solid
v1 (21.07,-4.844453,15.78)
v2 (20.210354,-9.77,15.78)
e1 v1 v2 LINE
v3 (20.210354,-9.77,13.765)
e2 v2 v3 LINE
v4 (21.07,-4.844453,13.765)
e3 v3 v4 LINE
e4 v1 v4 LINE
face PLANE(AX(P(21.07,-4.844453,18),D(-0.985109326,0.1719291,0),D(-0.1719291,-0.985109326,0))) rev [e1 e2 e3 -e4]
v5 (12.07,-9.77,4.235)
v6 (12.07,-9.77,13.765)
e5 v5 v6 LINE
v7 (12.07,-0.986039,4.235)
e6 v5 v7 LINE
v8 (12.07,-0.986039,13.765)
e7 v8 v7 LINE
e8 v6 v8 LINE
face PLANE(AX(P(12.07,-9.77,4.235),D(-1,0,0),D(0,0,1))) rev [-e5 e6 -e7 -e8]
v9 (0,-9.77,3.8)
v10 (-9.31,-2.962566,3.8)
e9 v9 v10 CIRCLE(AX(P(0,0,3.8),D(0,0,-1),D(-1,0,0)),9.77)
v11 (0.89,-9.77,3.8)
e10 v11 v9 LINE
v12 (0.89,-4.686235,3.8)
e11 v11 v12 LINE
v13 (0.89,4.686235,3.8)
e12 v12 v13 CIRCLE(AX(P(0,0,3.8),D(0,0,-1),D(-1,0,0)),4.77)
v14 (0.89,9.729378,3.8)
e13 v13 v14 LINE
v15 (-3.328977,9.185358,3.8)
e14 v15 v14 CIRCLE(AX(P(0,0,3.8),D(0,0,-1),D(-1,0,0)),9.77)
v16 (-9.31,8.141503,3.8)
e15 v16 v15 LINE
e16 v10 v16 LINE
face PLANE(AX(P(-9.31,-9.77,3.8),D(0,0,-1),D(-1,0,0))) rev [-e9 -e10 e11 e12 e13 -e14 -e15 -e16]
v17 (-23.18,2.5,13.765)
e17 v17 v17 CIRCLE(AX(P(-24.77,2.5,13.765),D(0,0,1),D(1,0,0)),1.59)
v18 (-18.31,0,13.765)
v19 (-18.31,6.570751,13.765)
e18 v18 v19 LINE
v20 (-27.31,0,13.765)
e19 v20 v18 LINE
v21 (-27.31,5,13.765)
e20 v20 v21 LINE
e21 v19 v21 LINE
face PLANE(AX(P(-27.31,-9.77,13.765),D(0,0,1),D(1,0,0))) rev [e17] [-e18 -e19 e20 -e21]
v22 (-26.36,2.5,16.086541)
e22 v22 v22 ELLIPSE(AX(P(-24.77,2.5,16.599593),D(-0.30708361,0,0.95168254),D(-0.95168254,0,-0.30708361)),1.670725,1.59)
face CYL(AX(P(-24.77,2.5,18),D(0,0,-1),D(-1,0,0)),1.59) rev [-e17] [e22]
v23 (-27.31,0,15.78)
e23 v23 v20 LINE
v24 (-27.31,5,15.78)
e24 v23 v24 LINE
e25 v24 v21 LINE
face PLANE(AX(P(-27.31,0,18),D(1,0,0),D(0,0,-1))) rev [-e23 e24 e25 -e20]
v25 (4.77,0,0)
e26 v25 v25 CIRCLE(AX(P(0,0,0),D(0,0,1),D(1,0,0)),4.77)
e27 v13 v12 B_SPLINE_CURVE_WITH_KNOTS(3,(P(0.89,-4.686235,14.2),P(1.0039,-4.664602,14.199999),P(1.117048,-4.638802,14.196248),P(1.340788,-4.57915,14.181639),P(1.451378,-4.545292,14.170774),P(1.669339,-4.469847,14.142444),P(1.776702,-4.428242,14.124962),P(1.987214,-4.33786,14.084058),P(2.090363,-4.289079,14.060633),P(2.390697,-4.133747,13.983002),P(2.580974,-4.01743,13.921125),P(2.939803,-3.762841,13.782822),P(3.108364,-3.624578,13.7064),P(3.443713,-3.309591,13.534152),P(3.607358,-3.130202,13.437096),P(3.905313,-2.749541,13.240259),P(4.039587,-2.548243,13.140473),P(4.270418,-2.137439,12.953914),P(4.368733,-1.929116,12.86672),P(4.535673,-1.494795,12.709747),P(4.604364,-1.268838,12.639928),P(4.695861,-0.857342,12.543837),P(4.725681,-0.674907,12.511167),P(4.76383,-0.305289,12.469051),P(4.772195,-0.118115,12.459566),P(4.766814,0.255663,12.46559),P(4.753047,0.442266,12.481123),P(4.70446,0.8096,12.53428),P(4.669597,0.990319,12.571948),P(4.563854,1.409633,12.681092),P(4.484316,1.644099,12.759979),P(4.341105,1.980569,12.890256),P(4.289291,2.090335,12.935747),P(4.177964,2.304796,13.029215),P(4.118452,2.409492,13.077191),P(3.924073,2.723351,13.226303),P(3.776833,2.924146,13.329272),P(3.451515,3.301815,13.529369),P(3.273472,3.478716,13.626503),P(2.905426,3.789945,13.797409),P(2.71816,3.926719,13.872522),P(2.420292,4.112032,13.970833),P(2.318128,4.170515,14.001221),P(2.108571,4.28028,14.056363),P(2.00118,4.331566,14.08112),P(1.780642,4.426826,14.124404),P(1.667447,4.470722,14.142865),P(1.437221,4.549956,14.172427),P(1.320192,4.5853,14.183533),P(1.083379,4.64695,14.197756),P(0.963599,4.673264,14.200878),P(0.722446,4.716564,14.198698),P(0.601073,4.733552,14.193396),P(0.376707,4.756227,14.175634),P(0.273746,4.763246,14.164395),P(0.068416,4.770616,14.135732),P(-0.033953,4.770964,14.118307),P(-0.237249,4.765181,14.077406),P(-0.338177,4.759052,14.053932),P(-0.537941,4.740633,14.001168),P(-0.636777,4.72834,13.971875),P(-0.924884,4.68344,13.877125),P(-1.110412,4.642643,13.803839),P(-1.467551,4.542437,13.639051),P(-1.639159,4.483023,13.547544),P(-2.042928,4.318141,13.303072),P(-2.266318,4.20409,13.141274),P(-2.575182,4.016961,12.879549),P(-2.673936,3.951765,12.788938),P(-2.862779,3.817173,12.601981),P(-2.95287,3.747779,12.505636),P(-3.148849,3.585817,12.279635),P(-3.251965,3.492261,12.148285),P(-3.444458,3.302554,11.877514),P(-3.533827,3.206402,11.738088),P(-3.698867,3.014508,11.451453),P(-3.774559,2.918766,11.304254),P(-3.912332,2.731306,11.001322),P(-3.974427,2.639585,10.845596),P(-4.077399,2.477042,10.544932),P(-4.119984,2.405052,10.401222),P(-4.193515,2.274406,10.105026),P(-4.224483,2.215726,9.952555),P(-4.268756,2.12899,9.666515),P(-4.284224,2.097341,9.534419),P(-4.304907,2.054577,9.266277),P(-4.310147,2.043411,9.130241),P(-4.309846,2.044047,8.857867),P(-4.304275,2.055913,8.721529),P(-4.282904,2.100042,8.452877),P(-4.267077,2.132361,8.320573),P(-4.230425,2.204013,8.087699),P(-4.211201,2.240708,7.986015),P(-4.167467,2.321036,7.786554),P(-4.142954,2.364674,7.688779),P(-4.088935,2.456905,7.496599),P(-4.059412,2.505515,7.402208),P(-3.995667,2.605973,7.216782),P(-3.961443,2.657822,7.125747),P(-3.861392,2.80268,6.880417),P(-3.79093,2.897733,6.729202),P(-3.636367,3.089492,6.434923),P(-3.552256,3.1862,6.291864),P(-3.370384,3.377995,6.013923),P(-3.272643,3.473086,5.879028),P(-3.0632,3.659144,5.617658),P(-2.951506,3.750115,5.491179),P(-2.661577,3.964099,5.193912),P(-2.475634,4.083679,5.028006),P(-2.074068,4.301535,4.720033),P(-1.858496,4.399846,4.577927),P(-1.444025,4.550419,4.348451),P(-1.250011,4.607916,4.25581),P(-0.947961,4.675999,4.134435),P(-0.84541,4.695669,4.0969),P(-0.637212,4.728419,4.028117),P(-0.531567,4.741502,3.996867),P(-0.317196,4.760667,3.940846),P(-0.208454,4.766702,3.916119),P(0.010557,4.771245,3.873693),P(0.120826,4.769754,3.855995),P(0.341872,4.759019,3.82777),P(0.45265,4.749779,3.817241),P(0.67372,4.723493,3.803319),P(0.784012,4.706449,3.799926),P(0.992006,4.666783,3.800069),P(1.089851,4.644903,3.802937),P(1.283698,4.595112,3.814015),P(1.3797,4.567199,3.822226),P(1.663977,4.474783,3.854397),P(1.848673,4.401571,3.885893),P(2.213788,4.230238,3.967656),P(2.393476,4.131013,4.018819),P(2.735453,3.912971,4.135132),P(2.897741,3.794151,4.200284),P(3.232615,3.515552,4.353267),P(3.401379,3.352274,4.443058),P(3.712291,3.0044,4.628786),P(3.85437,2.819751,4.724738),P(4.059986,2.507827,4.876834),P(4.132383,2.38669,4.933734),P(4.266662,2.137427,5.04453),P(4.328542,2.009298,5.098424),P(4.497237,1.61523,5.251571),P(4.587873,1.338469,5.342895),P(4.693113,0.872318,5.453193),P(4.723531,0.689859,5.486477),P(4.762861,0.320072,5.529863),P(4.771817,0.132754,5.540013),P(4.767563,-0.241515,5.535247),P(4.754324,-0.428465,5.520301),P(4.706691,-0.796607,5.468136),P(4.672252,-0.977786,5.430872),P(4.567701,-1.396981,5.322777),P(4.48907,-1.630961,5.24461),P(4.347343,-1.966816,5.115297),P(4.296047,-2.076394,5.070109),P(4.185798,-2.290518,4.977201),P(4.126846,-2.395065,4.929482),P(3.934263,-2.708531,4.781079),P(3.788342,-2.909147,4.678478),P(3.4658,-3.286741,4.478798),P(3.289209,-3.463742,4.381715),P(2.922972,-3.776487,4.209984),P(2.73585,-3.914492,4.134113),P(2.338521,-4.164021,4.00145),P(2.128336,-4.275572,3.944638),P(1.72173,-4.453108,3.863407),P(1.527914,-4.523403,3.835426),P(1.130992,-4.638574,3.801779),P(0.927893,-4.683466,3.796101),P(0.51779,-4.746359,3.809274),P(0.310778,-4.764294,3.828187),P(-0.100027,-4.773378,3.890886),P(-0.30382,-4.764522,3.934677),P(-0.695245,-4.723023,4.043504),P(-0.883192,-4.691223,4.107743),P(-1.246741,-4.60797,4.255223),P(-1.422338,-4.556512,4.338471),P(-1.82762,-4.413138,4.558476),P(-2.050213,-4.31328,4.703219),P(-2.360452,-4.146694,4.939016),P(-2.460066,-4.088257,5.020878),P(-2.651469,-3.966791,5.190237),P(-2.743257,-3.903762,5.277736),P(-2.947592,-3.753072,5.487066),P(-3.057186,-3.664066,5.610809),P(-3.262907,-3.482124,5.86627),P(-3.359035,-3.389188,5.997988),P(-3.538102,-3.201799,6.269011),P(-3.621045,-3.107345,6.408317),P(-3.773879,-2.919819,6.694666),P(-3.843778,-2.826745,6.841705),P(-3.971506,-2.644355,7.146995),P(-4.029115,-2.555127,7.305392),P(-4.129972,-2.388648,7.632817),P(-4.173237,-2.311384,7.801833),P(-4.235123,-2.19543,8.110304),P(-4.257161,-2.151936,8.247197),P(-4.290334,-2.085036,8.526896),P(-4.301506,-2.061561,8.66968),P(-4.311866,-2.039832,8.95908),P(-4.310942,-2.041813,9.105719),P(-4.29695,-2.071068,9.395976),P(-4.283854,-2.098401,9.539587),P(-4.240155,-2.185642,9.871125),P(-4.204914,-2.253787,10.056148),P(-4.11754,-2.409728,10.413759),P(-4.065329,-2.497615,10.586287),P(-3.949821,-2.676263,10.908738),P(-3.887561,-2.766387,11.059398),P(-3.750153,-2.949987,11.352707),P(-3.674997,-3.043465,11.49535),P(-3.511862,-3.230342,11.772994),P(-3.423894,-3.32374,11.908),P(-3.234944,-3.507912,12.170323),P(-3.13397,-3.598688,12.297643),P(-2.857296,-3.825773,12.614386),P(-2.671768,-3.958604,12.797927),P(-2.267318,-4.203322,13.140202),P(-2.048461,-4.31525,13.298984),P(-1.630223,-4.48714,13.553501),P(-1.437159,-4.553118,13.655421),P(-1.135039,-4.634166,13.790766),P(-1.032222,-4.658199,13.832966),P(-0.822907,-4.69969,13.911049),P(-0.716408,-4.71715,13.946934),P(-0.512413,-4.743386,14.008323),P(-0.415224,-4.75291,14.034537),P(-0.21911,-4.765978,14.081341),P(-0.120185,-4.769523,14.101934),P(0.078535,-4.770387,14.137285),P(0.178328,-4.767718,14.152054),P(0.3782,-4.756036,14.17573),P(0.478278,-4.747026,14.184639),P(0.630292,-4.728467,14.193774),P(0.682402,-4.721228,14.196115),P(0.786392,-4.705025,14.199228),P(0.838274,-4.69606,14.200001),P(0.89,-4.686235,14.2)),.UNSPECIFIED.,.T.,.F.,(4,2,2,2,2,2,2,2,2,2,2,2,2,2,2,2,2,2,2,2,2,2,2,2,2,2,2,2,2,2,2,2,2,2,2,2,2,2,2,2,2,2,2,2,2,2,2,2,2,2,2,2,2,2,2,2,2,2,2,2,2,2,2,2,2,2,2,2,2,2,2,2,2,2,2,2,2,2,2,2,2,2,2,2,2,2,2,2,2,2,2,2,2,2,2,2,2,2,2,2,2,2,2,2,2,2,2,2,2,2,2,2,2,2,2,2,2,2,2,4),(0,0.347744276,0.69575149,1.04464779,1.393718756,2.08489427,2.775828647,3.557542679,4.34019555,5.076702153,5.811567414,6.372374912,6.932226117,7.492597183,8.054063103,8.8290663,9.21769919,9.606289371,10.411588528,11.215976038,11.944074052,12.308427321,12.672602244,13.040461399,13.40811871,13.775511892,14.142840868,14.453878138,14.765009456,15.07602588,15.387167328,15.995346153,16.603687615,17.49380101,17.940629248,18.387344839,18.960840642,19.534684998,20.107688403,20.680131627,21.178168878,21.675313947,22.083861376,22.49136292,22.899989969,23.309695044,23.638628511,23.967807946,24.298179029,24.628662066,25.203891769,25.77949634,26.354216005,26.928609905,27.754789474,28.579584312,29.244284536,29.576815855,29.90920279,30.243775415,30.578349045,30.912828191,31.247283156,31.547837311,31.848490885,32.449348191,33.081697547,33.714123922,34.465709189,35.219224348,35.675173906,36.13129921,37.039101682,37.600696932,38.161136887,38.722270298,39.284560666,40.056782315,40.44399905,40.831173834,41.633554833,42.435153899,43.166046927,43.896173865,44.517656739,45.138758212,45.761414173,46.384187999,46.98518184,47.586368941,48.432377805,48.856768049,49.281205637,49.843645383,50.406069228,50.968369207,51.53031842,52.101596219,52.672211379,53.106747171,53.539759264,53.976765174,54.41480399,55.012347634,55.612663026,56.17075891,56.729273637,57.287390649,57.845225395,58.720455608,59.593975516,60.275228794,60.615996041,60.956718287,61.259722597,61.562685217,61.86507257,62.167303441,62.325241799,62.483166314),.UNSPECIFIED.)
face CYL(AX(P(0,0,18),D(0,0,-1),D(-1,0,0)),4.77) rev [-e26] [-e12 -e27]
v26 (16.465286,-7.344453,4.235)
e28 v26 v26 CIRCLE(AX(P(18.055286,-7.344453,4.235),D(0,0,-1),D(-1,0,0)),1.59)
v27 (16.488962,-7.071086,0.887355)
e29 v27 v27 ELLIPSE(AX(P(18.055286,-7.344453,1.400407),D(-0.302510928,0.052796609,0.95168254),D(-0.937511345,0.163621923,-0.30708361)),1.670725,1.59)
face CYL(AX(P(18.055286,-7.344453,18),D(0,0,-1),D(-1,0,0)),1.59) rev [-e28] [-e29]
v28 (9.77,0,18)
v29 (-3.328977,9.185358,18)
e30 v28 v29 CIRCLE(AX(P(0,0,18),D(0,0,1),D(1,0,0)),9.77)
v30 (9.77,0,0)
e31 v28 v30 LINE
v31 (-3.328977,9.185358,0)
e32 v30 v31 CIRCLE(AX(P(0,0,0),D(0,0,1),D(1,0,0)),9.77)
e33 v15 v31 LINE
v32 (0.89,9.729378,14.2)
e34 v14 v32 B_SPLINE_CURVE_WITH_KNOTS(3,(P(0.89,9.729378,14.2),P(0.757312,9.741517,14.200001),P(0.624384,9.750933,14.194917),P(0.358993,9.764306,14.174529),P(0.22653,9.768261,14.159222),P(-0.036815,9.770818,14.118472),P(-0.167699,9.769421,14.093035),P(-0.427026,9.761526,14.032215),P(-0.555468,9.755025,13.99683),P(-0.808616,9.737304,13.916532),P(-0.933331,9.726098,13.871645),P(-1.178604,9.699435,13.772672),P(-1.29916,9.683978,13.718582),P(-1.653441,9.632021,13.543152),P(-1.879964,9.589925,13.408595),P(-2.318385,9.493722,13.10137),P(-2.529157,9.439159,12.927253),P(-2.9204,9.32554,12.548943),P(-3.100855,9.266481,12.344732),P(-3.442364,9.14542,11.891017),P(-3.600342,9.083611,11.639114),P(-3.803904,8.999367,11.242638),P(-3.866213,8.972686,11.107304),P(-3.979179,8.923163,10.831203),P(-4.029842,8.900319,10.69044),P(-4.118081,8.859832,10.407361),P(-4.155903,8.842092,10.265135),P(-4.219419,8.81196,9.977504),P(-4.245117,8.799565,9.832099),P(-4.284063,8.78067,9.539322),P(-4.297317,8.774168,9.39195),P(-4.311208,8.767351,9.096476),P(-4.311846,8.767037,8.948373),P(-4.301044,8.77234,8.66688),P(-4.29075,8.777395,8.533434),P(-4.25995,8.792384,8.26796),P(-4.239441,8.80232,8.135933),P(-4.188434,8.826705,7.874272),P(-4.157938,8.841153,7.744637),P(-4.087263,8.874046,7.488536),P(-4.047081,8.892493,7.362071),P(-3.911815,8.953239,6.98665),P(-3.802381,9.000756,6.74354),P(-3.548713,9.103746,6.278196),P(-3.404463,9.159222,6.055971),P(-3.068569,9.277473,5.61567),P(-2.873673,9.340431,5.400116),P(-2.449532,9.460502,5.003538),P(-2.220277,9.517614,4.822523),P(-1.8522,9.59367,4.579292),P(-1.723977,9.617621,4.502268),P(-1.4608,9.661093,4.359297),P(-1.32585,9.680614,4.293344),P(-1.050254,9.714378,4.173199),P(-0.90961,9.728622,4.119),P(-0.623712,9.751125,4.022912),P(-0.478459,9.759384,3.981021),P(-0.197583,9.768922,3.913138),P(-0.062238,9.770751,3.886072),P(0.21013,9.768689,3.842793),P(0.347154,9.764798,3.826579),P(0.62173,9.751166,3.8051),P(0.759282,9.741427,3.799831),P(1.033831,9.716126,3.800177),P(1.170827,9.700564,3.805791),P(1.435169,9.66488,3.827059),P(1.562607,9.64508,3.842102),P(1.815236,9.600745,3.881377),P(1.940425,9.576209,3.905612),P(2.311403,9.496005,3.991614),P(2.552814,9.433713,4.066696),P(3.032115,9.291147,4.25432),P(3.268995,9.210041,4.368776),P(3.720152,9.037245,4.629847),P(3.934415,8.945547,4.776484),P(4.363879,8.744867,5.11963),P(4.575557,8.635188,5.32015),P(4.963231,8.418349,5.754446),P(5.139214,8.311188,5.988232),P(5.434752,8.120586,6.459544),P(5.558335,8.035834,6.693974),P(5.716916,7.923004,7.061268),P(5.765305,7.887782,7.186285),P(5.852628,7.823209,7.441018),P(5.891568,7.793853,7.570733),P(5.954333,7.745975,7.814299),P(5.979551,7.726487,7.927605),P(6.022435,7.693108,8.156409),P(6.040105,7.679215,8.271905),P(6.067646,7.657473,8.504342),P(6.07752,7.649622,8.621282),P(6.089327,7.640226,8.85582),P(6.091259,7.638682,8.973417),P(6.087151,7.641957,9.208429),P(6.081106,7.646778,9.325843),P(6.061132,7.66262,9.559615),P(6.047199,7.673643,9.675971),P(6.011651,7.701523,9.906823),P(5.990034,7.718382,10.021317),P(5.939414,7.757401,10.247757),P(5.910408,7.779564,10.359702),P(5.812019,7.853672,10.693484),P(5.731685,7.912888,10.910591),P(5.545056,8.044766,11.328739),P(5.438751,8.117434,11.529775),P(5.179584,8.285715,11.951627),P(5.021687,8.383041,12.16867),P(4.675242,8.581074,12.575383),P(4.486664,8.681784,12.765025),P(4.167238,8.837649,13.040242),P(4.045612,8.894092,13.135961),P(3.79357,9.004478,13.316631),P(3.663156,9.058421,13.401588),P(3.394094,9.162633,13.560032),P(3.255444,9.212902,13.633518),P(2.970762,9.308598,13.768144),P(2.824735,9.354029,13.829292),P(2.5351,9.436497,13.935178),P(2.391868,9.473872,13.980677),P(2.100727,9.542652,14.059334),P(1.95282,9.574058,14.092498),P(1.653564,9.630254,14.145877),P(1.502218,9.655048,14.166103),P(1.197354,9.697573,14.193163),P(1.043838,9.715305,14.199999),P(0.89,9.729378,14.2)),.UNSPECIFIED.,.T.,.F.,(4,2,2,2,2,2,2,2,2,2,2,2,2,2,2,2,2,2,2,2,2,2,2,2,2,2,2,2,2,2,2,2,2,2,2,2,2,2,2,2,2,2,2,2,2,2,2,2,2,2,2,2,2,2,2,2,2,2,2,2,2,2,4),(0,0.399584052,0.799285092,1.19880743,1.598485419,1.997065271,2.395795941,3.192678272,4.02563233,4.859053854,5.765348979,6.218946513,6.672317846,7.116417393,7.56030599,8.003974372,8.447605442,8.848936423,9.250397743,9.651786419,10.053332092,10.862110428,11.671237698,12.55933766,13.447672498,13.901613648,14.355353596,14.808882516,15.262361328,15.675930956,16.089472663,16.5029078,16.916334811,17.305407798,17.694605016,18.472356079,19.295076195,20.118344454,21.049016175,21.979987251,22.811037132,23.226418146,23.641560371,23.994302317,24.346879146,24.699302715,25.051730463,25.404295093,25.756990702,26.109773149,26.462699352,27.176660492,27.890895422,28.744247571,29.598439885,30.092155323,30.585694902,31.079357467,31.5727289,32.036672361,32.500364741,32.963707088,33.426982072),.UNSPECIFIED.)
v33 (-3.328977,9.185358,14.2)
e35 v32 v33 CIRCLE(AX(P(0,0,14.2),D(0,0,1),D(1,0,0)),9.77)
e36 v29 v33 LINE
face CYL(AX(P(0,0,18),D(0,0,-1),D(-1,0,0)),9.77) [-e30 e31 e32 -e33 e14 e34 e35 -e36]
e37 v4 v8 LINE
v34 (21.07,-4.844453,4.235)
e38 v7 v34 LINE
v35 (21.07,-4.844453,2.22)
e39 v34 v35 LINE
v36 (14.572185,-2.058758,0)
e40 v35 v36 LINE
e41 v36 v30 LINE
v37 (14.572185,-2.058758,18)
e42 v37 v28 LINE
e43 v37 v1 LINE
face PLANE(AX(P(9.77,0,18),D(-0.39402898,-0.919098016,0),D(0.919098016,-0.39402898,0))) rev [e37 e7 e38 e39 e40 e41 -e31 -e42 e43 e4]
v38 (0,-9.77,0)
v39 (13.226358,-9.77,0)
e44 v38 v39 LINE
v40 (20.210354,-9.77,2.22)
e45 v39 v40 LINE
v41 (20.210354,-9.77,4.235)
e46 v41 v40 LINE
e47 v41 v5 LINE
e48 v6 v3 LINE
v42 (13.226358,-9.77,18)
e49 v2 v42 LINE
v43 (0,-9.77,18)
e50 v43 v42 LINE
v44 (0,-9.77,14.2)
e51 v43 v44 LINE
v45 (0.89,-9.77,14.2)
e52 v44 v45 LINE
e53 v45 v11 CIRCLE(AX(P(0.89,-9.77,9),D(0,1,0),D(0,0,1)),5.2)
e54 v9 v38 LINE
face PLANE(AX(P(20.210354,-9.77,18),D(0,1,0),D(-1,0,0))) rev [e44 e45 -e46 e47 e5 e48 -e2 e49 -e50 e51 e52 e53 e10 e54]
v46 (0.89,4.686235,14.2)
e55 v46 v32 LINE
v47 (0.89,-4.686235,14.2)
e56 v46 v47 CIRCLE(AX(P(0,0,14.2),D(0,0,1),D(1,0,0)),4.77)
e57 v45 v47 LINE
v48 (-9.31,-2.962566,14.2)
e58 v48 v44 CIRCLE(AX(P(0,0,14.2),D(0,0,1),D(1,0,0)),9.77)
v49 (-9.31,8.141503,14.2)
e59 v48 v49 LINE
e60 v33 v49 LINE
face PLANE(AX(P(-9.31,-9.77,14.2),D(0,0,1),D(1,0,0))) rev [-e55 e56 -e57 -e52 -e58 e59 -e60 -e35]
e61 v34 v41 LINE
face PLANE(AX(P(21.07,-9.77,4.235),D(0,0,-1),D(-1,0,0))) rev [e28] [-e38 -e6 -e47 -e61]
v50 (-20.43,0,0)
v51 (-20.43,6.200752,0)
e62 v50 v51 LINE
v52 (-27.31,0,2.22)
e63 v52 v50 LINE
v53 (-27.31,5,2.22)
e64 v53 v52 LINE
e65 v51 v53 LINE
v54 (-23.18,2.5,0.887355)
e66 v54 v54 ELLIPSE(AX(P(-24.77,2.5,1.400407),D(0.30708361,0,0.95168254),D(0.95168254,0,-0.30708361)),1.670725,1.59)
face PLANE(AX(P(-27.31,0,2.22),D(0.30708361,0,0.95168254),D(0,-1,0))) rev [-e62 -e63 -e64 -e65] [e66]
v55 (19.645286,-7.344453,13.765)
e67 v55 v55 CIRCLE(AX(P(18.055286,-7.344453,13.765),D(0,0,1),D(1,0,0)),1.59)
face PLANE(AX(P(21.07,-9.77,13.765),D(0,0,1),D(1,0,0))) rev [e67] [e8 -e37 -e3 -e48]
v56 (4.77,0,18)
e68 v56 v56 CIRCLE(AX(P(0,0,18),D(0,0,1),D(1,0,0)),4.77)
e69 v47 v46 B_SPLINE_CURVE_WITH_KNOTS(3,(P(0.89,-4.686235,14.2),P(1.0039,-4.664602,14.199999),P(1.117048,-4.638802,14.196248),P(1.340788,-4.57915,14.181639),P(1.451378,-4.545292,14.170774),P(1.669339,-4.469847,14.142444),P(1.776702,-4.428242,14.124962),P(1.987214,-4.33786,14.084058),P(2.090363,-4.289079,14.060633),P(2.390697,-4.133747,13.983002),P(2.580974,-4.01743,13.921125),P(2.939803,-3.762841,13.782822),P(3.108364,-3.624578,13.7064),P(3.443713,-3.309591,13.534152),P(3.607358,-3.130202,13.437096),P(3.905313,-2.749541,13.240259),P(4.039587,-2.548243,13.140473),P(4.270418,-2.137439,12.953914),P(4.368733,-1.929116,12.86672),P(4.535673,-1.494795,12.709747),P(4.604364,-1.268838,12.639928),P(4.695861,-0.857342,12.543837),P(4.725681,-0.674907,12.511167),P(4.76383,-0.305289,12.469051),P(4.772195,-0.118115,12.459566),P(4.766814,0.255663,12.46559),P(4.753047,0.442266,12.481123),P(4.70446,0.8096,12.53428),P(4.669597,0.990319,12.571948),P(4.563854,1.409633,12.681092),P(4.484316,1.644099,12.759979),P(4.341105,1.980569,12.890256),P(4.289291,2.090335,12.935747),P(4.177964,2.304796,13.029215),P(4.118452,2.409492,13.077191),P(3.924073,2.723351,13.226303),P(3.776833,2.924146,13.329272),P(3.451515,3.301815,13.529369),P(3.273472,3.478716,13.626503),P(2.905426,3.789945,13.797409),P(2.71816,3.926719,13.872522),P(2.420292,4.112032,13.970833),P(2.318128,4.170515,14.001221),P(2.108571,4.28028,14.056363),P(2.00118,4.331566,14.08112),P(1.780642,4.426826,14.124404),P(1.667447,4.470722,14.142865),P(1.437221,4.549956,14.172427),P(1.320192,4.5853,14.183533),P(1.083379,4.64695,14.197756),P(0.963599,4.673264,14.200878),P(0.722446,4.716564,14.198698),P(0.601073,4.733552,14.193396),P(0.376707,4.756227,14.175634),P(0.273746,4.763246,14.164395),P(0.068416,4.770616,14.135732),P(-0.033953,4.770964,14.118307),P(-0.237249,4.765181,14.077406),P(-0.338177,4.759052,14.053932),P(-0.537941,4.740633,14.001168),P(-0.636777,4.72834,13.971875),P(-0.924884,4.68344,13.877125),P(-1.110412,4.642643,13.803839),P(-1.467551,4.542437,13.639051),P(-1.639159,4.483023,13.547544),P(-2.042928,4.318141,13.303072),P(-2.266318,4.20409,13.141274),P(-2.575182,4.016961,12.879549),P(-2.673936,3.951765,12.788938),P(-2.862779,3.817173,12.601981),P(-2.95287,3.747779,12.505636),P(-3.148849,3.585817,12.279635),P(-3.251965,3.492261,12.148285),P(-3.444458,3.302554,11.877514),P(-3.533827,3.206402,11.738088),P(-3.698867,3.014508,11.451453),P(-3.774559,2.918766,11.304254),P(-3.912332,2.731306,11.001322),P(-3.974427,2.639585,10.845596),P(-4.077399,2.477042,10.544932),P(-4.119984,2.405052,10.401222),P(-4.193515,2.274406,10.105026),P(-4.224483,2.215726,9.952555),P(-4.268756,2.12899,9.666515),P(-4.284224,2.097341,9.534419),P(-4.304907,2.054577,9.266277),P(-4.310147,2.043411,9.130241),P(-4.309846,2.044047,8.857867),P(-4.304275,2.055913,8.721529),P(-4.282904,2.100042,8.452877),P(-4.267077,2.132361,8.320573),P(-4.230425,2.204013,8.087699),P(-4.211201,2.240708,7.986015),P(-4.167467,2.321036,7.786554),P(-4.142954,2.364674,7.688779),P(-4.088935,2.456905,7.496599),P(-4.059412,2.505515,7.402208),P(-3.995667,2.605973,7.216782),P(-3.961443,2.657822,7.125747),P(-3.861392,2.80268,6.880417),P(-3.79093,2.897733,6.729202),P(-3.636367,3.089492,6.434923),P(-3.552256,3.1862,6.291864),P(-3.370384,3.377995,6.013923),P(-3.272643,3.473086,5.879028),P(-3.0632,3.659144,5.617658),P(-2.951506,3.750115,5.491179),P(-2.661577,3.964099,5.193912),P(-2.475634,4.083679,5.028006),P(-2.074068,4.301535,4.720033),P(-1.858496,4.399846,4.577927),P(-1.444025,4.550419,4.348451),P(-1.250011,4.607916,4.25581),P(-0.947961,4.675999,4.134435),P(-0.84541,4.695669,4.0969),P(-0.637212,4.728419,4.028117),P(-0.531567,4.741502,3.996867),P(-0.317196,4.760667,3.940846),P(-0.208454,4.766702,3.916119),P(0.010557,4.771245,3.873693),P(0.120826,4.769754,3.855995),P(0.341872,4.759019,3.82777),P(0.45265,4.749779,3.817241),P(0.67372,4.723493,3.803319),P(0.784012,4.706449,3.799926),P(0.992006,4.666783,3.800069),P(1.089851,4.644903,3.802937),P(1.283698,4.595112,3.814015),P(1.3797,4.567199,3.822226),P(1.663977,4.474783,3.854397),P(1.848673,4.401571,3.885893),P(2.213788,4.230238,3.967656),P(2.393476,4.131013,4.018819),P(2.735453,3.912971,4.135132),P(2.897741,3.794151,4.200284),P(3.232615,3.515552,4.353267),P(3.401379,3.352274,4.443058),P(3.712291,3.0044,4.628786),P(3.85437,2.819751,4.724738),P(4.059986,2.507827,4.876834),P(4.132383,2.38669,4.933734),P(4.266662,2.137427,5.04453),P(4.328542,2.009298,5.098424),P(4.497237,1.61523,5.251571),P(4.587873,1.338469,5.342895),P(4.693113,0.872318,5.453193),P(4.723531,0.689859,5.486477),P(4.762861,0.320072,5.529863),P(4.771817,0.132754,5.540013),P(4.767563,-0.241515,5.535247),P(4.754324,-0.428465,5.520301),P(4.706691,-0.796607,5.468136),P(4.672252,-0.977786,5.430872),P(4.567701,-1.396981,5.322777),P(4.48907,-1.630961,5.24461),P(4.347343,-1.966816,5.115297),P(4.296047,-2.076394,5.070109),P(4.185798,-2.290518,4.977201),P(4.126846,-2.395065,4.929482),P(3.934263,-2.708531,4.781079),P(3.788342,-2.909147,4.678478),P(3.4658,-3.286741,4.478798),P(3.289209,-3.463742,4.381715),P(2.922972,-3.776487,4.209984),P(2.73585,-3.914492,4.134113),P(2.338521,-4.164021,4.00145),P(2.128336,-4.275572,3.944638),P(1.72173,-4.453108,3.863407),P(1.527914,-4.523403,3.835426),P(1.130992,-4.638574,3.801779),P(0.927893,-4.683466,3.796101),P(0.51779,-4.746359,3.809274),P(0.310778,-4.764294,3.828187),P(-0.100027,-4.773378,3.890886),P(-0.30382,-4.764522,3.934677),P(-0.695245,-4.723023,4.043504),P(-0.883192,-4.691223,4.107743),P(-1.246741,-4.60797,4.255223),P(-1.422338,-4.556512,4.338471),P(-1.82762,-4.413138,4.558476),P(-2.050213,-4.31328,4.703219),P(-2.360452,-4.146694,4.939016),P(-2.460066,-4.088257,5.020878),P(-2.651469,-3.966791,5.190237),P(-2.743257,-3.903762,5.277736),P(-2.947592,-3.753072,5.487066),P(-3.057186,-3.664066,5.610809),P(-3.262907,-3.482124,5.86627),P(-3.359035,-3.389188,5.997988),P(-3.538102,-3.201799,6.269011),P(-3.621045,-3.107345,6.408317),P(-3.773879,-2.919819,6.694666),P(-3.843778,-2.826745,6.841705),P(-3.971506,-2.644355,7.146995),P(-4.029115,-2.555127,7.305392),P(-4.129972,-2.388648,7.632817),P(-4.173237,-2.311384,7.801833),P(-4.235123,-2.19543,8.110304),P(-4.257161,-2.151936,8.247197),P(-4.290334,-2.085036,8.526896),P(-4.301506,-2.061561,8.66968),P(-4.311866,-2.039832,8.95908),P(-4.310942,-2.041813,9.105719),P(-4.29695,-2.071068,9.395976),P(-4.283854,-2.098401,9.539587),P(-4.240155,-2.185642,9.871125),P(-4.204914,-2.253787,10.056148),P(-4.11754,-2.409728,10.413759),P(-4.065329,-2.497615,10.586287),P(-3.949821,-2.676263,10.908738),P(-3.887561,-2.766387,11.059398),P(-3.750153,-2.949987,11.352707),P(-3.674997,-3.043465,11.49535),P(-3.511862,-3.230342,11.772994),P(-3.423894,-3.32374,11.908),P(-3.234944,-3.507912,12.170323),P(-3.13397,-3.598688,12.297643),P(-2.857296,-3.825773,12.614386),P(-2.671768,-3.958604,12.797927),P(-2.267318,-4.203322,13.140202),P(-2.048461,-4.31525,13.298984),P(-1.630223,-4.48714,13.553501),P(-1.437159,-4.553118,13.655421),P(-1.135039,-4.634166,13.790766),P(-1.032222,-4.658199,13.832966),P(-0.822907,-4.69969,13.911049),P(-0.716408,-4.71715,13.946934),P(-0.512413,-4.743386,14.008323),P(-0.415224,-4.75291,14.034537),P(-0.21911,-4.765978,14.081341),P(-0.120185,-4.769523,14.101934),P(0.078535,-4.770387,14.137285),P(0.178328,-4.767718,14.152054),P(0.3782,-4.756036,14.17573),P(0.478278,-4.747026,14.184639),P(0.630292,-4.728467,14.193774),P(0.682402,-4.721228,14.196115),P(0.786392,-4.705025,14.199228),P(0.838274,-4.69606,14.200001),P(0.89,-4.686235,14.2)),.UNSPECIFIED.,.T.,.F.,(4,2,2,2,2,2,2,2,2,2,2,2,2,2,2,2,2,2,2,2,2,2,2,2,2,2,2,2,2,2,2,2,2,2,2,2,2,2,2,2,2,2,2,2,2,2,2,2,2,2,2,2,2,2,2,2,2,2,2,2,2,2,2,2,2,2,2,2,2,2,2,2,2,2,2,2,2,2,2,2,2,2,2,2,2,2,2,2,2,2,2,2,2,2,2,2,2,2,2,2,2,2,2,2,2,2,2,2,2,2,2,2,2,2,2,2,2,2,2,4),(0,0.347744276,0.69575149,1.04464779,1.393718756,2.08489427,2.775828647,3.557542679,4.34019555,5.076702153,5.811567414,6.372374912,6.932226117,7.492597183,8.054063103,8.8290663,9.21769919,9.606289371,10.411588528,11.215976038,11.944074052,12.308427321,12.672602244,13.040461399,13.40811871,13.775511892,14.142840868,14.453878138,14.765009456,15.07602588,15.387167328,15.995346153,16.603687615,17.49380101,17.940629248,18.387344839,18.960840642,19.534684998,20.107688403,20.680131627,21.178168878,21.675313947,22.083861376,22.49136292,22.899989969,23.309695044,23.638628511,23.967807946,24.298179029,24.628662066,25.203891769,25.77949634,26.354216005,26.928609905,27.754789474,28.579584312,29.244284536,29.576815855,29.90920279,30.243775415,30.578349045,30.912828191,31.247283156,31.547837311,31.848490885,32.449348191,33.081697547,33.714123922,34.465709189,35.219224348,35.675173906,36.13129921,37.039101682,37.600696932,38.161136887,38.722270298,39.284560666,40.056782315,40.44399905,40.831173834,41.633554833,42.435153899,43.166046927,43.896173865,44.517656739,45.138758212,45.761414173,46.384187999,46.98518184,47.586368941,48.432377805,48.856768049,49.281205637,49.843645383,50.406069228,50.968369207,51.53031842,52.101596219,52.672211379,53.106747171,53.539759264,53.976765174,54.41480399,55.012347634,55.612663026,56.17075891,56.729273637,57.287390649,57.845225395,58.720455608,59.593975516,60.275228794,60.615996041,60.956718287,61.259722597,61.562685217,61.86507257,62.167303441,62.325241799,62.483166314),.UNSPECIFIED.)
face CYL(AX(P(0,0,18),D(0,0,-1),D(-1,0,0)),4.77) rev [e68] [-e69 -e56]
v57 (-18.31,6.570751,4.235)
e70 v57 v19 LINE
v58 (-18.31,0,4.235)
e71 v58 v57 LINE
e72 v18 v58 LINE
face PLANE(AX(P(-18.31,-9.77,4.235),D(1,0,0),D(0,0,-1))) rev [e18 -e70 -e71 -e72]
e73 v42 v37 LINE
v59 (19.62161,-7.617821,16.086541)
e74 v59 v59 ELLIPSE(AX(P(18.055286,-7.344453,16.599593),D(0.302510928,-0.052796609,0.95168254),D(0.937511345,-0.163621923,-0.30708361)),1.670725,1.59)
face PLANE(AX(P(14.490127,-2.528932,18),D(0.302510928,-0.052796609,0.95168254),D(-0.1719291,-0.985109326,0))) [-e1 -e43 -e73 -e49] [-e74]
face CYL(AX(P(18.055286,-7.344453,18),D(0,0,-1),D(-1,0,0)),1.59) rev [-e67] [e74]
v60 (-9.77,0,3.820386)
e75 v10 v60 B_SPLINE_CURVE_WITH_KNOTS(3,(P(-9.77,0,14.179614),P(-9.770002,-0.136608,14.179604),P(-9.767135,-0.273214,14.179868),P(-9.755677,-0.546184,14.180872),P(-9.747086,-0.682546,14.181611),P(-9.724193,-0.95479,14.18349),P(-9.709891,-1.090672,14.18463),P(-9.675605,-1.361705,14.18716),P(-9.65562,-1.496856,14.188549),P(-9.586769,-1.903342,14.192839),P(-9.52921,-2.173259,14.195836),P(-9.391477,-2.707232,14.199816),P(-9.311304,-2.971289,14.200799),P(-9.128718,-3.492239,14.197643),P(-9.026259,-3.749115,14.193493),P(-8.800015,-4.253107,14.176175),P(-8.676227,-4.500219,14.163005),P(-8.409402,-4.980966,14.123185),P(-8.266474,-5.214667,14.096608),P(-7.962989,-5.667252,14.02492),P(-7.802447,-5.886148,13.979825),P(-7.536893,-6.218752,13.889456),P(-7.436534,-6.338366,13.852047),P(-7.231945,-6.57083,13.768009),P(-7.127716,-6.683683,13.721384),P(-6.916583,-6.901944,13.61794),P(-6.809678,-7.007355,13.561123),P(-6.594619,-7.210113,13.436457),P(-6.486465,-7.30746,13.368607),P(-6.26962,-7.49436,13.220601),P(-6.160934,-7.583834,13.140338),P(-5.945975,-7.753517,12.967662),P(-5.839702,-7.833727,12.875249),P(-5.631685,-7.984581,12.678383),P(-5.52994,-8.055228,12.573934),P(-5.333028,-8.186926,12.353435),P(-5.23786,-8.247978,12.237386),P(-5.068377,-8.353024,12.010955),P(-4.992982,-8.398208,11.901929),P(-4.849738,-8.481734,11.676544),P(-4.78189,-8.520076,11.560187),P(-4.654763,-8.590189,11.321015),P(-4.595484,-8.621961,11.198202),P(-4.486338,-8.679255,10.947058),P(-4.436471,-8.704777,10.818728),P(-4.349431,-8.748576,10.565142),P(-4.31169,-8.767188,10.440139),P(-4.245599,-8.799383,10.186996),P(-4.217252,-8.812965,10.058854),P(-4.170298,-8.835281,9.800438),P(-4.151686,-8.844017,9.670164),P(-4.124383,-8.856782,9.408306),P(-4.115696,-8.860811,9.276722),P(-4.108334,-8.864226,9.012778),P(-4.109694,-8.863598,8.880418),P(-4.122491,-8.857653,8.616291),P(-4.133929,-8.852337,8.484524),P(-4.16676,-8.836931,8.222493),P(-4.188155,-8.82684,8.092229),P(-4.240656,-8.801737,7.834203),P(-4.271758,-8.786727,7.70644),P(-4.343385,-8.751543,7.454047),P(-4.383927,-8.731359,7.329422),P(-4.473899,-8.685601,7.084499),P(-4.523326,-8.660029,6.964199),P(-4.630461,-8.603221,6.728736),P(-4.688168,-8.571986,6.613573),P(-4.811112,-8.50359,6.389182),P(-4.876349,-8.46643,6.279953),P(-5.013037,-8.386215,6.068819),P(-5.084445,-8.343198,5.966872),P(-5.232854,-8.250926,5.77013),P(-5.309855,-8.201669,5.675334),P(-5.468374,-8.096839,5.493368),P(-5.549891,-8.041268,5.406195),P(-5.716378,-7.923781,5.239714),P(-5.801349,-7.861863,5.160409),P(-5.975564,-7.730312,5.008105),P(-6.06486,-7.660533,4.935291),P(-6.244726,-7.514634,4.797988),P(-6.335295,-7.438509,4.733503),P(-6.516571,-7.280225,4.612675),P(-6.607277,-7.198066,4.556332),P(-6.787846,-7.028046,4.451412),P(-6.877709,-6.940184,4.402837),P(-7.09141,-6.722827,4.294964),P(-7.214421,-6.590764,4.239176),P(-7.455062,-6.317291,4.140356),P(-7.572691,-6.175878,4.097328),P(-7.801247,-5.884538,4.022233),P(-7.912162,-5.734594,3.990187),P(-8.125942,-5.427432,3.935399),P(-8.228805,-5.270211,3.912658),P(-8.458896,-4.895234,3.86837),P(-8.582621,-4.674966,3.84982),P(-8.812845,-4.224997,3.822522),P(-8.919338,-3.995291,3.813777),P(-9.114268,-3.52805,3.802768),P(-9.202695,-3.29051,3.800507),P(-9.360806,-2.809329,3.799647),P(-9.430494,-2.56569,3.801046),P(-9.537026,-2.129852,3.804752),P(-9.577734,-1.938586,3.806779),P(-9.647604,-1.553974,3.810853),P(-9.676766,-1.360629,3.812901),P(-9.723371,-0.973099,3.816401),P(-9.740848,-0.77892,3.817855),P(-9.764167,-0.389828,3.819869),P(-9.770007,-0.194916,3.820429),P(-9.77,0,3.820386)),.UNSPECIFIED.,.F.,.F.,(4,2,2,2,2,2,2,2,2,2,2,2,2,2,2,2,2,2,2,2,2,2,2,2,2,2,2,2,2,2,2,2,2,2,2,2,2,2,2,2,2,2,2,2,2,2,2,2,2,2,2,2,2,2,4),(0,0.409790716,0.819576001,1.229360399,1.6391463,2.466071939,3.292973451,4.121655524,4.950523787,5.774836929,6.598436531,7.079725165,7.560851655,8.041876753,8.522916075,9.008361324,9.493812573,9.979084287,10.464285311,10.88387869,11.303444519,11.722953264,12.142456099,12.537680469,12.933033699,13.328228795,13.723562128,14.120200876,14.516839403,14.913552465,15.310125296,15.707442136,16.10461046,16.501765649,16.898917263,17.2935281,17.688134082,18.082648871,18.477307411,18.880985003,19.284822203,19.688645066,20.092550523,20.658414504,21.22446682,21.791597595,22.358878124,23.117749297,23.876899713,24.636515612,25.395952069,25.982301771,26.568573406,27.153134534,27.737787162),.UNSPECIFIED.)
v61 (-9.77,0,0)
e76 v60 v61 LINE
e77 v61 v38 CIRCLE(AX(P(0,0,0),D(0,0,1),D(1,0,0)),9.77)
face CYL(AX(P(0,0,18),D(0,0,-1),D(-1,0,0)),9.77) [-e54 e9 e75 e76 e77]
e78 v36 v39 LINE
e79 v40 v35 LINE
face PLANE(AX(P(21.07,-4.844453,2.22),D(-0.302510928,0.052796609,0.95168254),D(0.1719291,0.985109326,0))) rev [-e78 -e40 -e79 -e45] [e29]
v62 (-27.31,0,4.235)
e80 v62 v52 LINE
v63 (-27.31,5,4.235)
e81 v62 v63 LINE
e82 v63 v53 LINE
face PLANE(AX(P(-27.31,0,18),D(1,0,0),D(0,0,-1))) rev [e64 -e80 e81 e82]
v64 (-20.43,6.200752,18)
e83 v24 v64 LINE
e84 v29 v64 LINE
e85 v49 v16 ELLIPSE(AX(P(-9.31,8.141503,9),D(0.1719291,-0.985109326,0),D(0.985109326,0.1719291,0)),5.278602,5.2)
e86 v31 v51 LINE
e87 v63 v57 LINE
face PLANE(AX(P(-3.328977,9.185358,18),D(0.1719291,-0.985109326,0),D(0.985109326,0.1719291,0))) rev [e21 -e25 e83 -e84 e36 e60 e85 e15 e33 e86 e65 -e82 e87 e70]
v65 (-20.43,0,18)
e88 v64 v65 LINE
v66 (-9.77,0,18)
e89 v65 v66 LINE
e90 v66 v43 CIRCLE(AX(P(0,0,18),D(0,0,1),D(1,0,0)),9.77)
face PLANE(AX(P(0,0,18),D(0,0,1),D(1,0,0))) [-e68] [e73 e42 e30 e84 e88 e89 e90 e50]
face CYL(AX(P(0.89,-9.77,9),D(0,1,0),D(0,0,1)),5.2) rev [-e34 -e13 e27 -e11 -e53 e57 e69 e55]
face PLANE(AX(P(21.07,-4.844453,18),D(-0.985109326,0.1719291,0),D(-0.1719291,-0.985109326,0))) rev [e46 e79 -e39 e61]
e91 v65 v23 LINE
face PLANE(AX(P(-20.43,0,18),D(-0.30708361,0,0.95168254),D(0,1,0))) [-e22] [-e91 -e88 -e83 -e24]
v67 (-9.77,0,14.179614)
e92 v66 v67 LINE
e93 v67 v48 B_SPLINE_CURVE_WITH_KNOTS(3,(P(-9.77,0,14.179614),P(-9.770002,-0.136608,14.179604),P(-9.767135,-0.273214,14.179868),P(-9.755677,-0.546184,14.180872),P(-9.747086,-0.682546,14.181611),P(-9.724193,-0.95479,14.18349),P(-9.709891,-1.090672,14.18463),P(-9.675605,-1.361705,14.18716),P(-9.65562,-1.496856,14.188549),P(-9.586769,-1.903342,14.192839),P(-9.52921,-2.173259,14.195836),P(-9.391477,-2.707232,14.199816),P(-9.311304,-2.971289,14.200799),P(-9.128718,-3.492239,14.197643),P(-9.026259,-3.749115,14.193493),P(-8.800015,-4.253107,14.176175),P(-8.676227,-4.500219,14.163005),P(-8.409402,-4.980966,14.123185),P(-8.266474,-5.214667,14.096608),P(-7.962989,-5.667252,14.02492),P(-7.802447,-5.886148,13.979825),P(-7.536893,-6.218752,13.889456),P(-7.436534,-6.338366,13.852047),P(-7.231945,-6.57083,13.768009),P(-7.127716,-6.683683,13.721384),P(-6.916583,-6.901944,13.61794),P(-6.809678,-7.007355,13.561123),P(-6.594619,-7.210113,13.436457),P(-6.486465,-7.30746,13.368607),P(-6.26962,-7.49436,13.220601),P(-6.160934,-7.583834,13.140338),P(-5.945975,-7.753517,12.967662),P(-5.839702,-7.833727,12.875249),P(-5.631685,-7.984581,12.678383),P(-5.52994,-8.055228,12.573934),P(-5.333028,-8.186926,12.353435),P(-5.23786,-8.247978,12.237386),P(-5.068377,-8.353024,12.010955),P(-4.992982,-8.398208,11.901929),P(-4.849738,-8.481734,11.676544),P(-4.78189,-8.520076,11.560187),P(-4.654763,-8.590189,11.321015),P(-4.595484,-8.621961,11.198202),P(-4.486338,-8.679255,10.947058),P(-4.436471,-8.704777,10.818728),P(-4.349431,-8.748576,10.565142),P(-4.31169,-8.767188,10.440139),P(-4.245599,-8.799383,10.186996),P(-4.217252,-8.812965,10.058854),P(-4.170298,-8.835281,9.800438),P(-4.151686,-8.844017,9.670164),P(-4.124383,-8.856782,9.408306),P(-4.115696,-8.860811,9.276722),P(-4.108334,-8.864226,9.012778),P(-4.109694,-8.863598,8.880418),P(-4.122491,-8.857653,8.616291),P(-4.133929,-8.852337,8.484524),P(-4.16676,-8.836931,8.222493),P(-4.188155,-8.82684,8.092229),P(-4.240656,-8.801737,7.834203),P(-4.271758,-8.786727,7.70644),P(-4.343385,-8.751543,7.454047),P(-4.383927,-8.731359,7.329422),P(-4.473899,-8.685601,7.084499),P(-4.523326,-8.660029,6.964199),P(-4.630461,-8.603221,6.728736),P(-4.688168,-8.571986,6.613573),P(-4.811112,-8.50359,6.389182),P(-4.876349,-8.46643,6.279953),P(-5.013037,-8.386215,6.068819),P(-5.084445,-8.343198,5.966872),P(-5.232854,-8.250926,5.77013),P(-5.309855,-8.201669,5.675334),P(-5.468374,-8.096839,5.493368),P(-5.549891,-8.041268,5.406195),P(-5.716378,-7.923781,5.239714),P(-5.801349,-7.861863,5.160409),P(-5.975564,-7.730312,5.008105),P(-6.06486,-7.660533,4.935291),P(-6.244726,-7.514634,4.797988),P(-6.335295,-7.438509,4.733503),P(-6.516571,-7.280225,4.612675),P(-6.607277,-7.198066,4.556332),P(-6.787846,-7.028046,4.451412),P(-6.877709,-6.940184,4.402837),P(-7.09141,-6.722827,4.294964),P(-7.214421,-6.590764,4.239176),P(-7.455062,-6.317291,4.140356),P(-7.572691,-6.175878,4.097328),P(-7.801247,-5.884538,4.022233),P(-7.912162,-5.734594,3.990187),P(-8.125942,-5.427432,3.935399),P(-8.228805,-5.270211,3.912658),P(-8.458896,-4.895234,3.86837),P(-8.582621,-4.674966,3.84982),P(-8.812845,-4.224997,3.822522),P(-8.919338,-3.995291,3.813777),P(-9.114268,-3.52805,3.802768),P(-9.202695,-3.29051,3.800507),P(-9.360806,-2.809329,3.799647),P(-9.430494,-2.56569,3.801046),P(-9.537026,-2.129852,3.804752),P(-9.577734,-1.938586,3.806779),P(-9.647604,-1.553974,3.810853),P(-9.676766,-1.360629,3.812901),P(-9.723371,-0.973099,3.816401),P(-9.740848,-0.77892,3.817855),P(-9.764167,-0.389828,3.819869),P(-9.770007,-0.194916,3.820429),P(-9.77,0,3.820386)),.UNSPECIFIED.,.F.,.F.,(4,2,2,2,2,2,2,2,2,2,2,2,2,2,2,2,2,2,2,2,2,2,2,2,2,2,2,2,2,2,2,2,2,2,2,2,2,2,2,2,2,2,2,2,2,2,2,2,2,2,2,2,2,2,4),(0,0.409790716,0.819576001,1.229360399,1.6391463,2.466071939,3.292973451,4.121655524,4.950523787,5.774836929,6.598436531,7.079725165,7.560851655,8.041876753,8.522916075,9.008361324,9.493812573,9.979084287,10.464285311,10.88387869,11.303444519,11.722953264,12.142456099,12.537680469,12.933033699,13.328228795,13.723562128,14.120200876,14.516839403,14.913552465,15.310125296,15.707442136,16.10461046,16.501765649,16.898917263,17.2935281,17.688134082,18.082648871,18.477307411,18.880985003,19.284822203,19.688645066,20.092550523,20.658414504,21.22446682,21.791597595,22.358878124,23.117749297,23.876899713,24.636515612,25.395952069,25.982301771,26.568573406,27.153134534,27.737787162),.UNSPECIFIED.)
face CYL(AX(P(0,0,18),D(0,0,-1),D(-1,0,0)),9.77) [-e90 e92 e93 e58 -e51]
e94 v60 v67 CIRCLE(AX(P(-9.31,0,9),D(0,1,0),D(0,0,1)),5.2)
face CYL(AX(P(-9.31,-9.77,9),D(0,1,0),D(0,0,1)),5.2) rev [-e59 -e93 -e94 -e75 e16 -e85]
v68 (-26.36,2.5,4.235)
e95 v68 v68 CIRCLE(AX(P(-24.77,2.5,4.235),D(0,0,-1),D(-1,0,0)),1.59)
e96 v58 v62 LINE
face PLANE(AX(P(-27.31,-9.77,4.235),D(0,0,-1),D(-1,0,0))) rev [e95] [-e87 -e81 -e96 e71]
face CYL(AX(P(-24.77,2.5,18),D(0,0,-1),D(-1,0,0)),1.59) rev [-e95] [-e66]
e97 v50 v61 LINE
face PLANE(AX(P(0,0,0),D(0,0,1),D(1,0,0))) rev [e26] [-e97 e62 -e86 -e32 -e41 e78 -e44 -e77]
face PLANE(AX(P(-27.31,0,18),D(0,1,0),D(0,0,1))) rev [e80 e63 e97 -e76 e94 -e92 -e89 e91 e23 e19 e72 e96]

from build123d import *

# Parameters (mm, degrees)
SKETCH1_R               = 4.77
SKETCH1_R_2             = 1.59
BOSS_EXTRUDE1_DEPTH     = 18
CHAMFER1_SIZE           = 2.22
CHAMFER1_SIZE_2         = 6.88
CHAMFER2_SIZE           = 6.88
CHAMFER2_SIZE_2         = 2.22
CUT_EXTRUDE1_DEPTH      = 35.136329621
CUT_EXTRUDE1_DEPTH_BACK = 35.136329621
SKETCH3_W               = 9
SKETCH3_H               = 9.53


with BuildPart() as part:
    # Sketch1 → Boss-Extrude1 (new body)
    with BuildSketch(Plane.XY):
        with BuildLine():
            Line((-27.31, 0), (-27.31, 5))
            Line((-27.31, 5), (-3.328977305, 9.185358464))
            ThreePointArc((-3.328977305, 9.185358464), (5.609313315, 7.999281476), (9.77, 0))
            Line((9.77, 0), (21.07, -4.844453369))
            Line((21.07, -4.844453369), (20.210354499, -9.77))
            Line((20.210354499, -9.77), (0, -9.77))
            ThreePointArc((0, -9.77), (-6.908433252, -6.908433252), (-9.77, 0))
            Line((-9.77, 0), (-27.31, 0))
        make_face()
        Circle(SKETCH1_R, mode=Mode.SUBTRACT)
        with Locations((-24.77, 2.5)):
            Circle(SKETCH1_R_2, mode=Mode.SUBTRACT)
        with Locations((18.055286128, -7.344453369)):
            Circle(SKETCH1_R_2, mode=Mode.SUBTRACT)
    extrude(amount=BOSS_EXTRUDE1_DEPTH)

    # Chamfer1
    # the kernel refuses this chamfer: 6.88, 2.22 mm, written as the material it takes off along each edge
    with BuildSketch(Plane(origin=(-27.31, -17.856007533, 18), x_dir=(-0.11292116623223689, 0, -0.9936039503830244), z_dir=(0, 1, 0))) as chamfer1_piece_1:
        Polygon((CHAMFER1_SIZE * 0.993603950383, -CHAMFER1_SIZE * 0.112921166232), (-CHAMFER1_SIZE_2 * 0.112921166232, -CHAMFER1_SIZE_2 * 0.993603950383), (0, 0), align=None)
    extrude(amount=40.712015065, mode=Mode.SUBTRACT)
    with BuildSketch(Plane(origin=(-27.31, -17.856007533, 0), x_dir=(-0.1129211662322369, 0, 0.9936039503830242), z_dir=(0, 1, 0))) as chamfer1_piece_2:
        Polygon((CHAMFER1_SIZE * 0.993603950383, CHAMFER1_SIZE * 0.112921166232), (-CHAMFER1_SIZE_2 * 0.112921166232, CHAMFER1_SIZE_2 * 0.993603950383), (0, 0), align=None)
    extrude(amount=40.712015065, mode=Mode.SUBTRACT)

    # Chamfer2
    # the kernel refuses this chamfer: 6.88, 2.22 mm, written as the material it takes off along each edge
    with BuildSketch(Plane(origin=(24.13996731, 12.745666179, 0), x_dir=(-0.9850403671370294, 0.1719170650041742, -0.011832069594835619), z_dir=(-0.17192910027940936, -0.985109326154774, 0))) as chamfer2_piece_1:
        Polygon((CHAMFER2_SIZE * 0.999929998614, -CHAMFER2_SIZE * 0.0118320695948), (-CHAMFER2_SIZE_2 * 0.0118320695948, -CHAMFER2_SIZE_2 * 0.999929998614), (0, 0), align=None)
    extrude(amount=40.712015065, mode=Mode.SUBTRACT)
    with BuildSketch(Plane(origin=(24.13996731, 12.745666179, 18), x_dir=(-0.9850403671370294, 0.1719170650041742, 0.011832069594835435), z_dir=(-0.17192910027940936, -0.985109326154774, 0))) as chamfer2_piece_2:
        Polygon((CHAMFER2_SIZE * 0.999929998614, CHAMFER2_SIZE * 0.0118320695948), (-CHAMFER2_SIZE_2 * 0.0118320695948, CHAMFER2_SIZE_2 * 0.999929998614), (0, 0), align=None)
    extrude(amount=40.712015065, mode=Mode.SUBTRACT)

    # Sketch3 → Cut-Extrude1 (cut, two sides: drawn at the far end of the back side and taken through both)
    with BuildSketch(Plane(origin=(0, 0, 0), x_dir=(1, 0, 0), z_dir=(0, 1, 0)).offset(-CUT_EXTRUDE1_DEPTH_BACK)):
        with Locations((-22.81, -9)):
            Rectangle(SKETCH3_W, SKETCH3_H)
        with BuildLine():
            Line((-9.31, -3.8), (0.89, -3.8))
            ThreePointArc((0.89, -3.8), (6.09, -9), (0.89, -14.2))
            Line((0.89, -14.2), (-9.31, -14.2))
            ThreePointArc((-9.31, -14.2), (-14.51, -9), (-9.31, -3.8))
        make_face()
        with Locations((16.57, -9)):
            Rectangle(SKETCH3_W, SKETCH3_H)
    extrude(amount=CUT_EXTRUDE1_DEPTH + CUT_EXTRUDE1_DEPTH_BACK, mode=Mode.SUBTRACT)


solid = part.part
